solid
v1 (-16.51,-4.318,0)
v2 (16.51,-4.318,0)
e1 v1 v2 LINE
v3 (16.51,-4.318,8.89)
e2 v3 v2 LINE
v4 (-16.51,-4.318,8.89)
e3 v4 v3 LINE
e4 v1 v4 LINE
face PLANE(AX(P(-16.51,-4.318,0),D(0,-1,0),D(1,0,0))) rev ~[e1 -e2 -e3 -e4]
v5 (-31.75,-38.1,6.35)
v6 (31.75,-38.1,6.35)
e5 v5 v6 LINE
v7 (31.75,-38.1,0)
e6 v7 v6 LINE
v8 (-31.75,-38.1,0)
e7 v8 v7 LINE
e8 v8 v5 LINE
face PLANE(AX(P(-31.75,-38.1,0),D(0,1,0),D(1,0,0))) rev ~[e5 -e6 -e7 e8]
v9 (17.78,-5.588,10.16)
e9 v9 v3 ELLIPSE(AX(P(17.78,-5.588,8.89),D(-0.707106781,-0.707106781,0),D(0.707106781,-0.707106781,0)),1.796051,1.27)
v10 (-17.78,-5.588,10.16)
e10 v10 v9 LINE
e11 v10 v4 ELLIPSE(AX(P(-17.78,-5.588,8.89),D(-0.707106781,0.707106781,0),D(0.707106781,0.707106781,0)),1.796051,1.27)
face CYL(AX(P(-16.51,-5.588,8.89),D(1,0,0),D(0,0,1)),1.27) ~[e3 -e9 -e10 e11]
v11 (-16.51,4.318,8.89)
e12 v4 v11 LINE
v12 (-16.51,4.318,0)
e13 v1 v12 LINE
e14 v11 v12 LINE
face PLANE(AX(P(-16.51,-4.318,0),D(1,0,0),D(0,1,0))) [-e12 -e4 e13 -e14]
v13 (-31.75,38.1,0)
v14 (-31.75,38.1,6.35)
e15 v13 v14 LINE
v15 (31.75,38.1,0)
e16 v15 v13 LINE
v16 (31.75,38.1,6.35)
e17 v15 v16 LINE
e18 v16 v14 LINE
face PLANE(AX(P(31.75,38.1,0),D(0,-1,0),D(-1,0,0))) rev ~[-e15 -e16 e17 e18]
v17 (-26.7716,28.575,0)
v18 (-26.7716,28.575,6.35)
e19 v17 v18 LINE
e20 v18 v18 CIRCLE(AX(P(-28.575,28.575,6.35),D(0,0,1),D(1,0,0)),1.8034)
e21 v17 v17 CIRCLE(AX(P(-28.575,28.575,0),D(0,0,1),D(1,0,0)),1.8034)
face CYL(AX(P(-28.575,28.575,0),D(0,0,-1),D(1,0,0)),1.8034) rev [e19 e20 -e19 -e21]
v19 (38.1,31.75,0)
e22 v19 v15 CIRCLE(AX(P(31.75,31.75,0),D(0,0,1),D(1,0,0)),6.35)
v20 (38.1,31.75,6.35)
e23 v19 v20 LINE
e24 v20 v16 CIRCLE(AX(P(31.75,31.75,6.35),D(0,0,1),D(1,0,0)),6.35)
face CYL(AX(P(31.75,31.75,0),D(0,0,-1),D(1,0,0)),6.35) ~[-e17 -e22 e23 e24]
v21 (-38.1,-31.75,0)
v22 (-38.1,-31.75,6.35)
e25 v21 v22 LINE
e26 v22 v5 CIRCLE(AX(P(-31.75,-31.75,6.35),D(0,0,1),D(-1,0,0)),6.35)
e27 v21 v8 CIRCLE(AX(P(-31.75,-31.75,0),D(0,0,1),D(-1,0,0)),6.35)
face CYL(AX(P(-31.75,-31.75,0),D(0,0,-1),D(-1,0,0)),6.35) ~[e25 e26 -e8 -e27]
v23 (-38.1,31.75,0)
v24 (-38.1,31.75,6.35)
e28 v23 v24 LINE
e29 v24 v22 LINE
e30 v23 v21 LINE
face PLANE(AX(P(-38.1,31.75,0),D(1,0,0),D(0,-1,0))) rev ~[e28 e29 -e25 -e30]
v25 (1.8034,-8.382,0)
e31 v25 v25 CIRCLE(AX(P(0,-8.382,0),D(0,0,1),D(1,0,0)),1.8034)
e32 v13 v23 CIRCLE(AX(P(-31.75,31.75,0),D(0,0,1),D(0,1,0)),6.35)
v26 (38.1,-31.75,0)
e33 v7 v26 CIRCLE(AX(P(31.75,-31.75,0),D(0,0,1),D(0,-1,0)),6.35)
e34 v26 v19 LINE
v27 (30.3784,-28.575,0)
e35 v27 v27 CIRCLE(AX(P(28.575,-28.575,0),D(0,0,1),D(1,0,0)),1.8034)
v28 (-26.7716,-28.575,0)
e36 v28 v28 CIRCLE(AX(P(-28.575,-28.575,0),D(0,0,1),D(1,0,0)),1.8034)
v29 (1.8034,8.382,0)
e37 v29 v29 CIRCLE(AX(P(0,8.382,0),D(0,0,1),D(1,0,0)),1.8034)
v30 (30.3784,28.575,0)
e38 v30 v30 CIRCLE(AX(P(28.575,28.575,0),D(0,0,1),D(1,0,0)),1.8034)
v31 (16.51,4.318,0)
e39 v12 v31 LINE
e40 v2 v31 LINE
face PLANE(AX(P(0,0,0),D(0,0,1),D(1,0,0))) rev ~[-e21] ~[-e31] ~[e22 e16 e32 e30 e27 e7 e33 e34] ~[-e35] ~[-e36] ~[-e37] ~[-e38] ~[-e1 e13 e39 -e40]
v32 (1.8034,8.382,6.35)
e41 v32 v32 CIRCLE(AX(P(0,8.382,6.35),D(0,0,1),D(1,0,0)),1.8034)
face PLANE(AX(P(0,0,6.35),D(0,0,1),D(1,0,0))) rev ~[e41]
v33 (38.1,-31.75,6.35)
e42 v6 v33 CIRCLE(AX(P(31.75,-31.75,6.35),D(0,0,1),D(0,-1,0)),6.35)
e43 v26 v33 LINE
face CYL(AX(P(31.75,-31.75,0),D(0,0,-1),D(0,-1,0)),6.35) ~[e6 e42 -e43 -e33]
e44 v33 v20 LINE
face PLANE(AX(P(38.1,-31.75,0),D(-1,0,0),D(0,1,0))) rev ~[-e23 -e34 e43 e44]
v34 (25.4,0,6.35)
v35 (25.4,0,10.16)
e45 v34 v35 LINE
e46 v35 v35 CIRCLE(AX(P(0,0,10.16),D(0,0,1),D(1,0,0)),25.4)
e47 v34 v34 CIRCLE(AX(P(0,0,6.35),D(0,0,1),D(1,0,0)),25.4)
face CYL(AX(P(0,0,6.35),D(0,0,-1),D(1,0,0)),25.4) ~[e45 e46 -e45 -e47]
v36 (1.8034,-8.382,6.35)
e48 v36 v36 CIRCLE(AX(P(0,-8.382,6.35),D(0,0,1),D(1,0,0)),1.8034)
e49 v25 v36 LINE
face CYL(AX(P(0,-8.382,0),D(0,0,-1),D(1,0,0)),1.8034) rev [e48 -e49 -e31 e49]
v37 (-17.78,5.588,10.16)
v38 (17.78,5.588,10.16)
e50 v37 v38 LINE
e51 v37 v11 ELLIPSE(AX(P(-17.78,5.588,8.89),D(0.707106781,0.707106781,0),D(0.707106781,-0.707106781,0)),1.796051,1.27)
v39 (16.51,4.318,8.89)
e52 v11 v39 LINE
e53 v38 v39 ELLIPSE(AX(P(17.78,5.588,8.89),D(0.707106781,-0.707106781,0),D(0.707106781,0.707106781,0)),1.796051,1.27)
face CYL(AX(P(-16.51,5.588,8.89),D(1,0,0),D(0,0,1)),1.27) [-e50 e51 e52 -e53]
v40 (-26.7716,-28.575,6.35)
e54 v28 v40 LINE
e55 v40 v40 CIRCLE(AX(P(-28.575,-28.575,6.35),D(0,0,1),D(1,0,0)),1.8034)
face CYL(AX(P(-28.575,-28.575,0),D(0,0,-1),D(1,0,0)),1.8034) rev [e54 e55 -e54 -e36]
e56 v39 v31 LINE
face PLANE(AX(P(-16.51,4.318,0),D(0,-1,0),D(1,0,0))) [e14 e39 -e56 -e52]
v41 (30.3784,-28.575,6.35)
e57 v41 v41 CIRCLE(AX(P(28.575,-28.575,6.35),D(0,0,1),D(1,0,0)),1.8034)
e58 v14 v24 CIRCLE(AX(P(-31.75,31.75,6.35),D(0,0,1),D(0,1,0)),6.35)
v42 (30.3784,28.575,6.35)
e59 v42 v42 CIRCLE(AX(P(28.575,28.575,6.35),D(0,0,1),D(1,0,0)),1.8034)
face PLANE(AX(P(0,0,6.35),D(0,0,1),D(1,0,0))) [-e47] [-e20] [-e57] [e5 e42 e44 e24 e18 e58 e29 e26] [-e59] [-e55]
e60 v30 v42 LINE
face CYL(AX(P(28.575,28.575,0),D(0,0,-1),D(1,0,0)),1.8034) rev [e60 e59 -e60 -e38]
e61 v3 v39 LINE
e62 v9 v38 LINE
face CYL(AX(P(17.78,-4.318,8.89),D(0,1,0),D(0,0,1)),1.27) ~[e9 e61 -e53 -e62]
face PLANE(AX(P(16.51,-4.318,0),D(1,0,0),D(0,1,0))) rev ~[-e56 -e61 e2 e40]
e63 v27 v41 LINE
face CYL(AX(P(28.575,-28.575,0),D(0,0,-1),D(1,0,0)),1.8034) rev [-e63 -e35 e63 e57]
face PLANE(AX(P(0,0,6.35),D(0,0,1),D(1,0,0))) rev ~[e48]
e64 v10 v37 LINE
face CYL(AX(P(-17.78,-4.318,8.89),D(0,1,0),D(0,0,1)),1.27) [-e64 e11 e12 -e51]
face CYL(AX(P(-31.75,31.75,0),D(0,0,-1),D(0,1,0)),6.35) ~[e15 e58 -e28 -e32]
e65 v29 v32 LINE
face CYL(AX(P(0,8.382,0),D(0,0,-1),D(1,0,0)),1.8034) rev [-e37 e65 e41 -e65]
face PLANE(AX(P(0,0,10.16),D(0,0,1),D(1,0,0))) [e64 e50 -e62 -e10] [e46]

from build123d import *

# Parameters (mm, degrees)
F0_R     = 1.8034
F0_R_2   = 25.4
F0_W     = 33.02
F0_H     = 8.636
F1_DEPTH = 6.35
F2_R     = 25.4
F3_DEPTH = 3.81
F4_DEPTH = 12.7
F5_R     = 1.27


# Not quite as in the source:
# - a feature names something its author has since deleted; it is built from what else it names


with BuildPart() as f1:
    # F0 (on Top) → F1 (new body)
    with BuildSketch(Plane.XY):
        with BuildLine():
            Line((-31.75, -38.1), (31.75, -38.1))
            ThreePointArc((31.75, -38.1), (36.2401280605, -36.2401280605), (38.1, -31.75))
            Line((38.1, -31.75), (38.1, 31.75))
            ThreePointArc((38.1, 31.75), (36.2401280605, 36.2401280605), (31.75, 38.1))
            Line((31.75, 38.1), (-31.75, 38.1))
            ThreePointArc((-31.75, 38.1), (-36.2401280605, 36.2401280605), (-38.1, 31.75))
            Line((-38.1, 31.75), (-38.1, -31.75))
            ThreePointArc((-38.1, -31.75), (-36.2401280605, -36.2401280605), (-31.75, -38.1))
        make_face()
        with Locations((-28.575, -28.575)):
            Circle(F0_R, mode=Mode.SUBTRACT)
        with Locations((28.575, -28.575)):
            Circle(F0_R, mode=Mode.SUBTRACT)
        with Locations((-28.575, 28.575)):
            Circle(F0_R, mode=Mode.SUBTRACT)
        Circle(F0_R_2, mode=Mode.SUBTRACT)
        with Locations((28.575, 28.575)):
            Circle(F0_R, mode=Mode.SUBTRACT)
        Circle(F0_R_2)
        with Locations((0, -8.382)):
            Circle(F0_R, mode=Mode.SUBTRACT)
        Rectangle(F0_W, F0_H, mode=Mode.SUBTRACT)
        with Locations((0, 8.382)):
            Circle(F0_R, mode=Mode.SUBTRACT)
    extrude(amount=F1_DEPTH)

    # F2 (on face) → F3 (join)
    with BuildSketch(Plane.XY.offset(6.35)):
        Circle(F2_R)
    extrude(amount=F3_DEPTH)

    # F0 (on Top) → F4 (cut, symmetric)
    with BuildSketch(Plane.XY):
        Rectangle(F0_W, F0_H)
    extrude(amount=F4_DEPTH, both=True, mode=Mode.SUBTRACT)

    # F5
    f5_edges = [f1.edges().sort_by_distance(p)[0] for p in [
        (0, 4.318, 10.16),
        (-16.51, 0, 10.16),
        (0, -4.318, 10.16),
        (16.51, 0, 10.16),
    ]]
    fillet(f5_edges, radius=F5_R)


solid = f1.part
